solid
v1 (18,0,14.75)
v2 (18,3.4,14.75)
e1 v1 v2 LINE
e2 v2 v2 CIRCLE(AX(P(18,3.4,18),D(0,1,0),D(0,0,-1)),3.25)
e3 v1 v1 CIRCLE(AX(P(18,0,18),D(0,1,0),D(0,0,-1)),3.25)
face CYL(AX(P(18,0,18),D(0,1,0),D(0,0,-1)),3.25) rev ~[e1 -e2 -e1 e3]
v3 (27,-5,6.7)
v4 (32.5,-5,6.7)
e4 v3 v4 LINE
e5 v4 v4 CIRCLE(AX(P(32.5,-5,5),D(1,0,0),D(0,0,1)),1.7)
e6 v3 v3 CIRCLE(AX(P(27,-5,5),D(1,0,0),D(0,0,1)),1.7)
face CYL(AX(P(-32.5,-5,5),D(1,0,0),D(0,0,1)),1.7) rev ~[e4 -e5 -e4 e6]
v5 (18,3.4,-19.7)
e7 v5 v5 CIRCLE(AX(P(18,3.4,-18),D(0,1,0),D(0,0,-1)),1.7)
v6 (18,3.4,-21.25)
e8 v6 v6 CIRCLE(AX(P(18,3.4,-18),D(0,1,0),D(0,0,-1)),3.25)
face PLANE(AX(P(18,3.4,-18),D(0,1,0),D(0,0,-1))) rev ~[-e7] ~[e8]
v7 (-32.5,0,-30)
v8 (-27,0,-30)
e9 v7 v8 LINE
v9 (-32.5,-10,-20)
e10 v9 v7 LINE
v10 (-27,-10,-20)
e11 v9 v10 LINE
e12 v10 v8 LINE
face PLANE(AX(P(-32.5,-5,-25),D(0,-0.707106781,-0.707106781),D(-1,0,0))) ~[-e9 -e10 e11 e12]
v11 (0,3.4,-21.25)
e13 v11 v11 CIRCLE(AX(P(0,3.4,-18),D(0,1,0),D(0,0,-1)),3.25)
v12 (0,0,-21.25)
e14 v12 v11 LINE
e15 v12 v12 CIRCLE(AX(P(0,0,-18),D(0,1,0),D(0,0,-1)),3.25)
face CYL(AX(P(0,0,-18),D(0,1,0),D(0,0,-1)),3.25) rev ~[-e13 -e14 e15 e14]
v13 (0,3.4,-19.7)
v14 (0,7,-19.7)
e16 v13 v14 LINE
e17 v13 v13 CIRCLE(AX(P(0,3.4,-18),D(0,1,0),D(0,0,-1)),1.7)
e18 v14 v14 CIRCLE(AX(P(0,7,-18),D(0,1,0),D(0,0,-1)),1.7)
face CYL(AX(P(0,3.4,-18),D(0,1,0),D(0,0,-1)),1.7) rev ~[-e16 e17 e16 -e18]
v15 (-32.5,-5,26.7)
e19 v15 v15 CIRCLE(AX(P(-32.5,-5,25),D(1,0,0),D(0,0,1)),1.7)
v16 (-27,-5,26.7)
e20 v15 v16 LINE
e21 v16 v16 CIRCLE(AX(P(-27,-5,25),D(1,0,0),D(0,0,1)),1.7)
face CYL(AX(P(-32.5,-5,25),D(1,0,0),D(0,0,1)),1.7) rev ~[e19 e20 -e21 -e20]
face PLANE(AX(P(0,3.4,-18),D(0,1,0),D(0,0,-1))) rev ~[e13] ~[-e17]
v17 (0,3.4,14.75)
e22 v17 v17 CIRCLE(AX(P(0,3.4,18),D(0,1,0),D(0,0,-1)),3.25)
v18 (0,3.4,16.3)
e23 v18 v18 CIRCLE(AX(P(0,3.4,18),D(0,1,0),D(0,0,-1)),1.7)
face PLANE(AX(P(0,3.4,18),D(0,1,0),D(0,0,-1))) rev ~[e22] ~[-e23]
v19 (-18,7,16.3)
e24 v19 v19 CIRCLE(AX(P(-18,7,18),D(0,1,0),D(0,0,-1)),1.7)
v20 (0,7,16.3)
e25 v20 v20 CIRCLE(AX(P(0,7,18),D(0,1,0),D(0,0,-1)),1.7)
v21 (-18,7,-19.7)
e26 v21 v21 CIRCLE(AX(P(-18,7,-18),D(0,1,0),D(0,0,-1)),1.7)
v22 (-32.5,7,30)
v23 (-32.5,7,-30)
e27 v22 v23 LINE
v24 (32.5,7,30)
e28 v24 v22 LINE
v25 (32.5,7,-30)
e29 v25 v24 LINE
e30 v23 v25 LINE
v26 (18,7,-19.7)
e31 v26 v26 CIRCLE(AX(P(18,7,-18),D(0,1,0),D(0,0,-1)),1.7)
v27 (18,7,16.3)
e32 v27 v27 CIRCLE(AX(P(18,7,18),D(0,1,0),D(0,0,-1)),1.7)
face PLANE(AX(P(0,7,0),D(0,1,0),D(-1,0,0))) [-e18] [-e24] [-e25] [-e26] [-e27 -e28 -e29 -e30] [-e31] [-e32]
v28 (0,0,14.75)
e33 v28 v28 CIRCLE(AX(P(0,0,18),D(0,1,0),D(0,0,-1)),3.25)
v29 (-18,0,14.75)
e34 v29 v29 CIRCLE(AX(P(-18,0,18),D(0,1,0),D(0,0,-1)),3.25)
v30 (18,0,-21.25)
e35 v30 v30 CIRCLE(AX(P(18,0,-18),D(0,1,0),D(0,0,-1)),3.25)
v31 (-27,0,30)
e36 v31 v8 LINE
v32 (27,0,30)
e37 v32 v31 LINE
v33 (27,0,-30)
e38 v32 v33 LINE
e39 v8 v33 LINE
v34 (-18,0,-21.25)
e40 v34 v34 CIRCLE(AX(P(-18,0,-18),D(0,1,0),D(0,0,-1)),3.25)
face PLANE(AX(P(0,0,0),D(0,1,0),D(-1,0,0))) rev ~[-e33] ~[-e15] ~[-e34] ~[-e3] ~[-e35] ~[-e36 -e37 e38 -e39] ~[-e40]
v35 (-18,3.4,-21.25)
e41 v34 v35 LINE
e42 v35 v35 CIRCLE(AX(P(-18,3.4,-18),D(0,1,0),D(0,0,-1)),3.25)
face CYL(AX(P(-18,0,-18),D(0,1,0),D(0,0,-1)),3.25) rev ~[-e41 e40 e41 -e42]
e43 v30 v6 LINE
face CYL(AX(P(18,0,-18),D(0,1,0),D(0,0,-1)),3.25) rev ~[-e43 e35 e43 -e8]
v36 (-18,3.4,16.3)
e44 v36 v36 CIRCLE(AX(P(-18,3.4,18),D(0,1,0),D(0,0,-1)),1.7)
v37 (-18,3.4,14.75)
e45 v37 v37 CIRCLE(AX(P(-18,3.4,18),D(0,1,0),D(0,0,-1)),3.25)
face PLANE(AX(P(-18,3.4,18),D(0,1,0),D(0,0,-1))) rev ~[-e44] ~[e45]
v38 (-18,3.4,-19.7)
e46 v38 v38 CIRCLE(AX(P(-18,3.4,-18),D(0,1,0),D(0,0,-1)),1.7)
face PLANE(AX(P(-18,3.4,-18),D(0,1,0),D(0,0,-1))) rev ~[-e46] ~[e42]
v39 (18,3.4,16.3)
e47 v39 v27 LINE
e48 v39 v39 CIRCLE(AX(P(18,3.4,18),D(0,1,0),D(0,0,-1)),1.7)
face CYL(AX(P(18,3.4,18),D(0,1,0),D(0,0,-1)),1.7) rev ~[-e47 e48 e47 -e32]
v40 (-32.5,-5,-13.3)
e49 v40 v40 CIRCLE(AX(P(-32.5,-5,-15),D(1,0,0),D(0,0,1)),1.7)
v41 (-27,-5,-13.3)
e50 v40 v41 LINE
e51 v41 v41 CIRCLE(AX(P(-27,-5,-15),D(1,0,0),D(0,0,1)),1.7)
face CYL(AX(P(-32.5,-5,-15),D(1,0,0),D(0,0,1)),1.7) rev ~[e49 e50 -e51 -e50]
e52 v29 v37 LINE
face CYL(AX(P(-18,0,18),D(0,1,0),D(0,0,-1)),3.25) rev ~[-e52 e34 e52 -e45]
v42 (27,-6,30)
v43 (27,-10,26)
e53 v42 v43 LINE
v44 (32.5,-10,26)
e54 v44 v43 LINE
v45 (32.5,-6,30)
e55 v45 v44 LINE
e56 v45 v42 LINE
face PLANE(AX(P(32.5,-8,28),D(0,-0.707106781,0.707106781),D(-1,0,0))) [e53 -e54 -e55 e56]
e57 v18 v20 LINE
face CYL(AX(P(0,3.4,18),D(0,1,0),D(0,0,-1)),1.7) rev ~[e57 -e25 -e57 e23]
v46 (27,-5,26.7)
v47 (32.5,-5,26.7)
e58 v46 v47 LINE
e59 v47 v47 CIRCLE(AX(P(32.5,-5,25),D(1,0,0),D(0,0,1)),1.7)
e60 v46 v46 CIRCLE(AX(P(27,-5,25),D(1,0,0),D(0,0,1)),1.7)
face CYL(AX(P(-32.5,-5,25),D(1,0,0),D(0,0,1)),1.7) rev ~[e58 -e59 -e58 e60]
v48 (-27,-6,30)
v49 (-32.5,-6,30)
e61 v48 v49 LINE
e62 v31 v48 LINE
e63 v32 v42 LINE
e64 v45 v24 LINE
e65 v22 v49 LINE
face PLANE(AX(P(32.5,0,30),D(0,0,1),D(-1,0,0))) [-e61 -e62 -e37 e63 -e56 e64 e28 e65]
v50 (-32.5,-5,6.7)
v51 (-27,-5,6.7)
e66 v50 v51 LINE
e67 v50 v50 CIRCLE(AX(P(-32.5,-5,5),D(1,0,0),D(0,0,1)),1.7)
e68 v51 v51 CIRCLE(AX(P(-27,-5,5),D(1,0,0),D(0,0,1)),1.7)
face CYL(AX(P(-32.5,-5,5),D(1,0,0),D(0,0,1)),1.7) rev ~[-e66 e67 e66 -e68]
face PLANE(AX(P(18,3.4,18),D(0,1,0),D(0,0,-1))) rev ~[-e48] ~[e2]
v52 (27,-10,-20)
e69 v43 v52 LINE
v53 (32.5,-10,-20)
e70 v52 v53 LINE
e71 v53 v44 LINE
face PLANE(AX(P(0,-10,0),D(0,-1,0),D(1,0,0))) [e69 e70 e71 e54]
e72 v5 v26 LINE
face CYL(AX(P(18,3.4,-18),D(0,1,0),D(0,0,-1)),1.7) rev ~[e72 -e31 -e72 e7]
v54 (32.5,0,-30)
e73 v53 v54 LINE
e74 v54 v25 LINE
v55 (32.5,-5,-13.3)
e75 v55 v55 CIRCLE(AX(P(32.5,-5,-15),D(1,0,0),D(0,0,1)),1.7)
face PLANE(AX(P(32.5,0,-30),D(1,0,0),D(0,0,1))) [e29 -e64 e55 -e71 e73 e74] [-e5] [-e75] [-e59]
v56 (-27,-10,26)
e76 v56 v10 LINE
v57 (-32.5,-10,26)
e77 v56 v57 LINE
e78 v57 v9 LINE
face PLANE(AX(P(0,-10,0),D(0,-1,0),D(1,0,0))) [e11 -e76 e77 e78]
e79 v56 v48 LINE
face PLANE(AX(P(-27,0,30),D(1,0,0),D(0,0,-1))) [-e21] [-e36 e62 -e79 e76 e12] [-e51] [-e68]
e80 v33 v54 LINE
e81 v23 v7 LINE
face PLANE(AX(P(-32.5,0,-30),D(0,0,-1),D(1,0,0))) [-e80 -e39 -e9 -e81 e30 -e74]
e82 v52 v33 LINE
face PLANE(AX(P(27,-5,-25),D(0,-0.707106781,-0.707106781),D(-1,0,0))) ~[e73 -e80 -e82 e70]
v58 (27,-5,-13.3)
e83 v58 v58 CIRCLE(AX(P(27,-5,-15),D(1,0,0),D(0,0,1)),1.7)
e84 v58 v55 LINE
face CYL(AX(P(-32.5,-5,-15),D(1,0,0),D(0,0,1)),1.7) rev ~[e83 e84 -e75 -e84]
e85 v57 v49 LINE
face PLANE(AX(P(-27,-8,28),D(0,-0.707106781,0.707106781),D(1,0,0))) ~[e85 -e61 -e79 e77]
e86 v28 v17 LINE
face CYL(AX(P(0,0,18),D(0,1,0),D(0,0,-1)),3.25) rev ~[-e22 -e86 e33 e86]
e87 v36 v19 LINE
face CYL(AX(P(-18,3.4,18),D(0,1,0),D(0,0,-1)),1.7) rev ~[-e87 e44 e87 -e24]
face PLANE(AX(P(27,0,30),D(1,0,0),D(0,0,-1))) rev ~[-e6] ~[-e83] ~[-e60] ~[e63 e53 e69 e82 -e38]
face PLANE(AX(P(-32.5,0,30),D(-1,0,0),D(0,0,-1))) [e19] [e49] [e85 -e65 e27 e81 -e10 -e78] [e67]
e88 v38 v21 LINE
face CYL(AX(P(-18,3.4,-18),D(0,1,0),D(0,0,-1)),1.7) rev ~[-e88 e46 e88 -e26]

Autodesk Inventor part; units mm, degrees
ref_plane "YZ Plane" through (0, 0, 0) normal (1, 0, 0) x (0, 1, 0)
ref_plane "XZ Plane" through (0, 0, 0) normal (0, 1, 0) x (-1, 0, 0)
ref_plane "XY Plane" through (0, 0, 0) normal (0, 0, 1) x (1, 0, 0)
sketch "Skizze1" plane through (0, 0, 0) normal (0, 1, 0) x (-1, 0, 0)
  line L0 (-32.5, 30) -> (32.5, 30)
  line L1 (32.5, 30) -> (32.5, -30)
  line L2 (32.5, -30) -> (-32.5, -30)
  line L3 (-32.5, -30) -> (-32.5, 30)
  line L4 (-32.5, 30) -> (32.5, -30) construction
  line L5 (32.5, 30) -> (-32.5, -30) construction
  point P0 (0, 0)
  dimension "d0" = 65
  dimension "d1" = 60
extrude "Extrusion1" add sketch "Skizze1" along normal blind 7
sketch "Skizze2" plane through (0, 7, 0) normal (0, 1, 0) x (1, 0, 0)
  line L0 (24.5, -20) -> (-24.5, -20)
  line L1 (-24.5, -20) -> (-24.5, 20)
  line L2 (-24.5, 20) -> (24.5, 20)
  line L3 (24.5, 20) -> (24.5, -20)
  line L4 (24.5, -20) -> (-24.5, 20) construction
  line L5 (-24.5, -20) -> (24.5, 20) construction
  line L6 (29.8936, 0) -> (-30.3656, 0) construction
  point P0 (0, 0)
  point P1 (0, 0)
  point P2 (-24.5, 0)
  point P3 (24.5, 0)
  dimension "d4" = 49
  dimension "d5" = 40
hole "Bohrung1" [suppressed]
sketch "Skizze3" plane through (0, 0, 0) normal (0, -1, 0) x (1, 0, 0)
  line L0 (-18, -18) -> (18, -18)
  line L1 (18, -18) -> (18, 18)
  line L2 (18, 18) -> (-18, 18)
  line L3 (-18, 18) -> (-18, -18)
  line L4 (-18, -18) -> (18, 18) construction
  line L5 (18, -18) -> (-18, 18) construction
  line L6 (0, -22.3415) -> (0, 25.3309) construction
  point P0 (0, 0)
  point P1 (0, 18)
  point P2 (0, -18)
  dimension "d13" = 36
  dimension "d14" = 36
hole "Bohrung2" at (0, 0, 18) at (0, 0, -18) at (-18, 0, 18) at (-18, 0, -18) at (18, 0, 18) at (18, 0, -18) direction (0, 1, 0) diameter 3.4 depth 8 tip angle 118 counterbore diameter 6.5 counterbore depth 3.4 clearance for "Inbusschraube ISO 4762" size "M3" standard "ISO"
sketch "Skizze4" plane through (0, 0, 0) normal (0, -1, 0) x (1, 0, 0)
  circle A0 centre (18, 18) radius 3.25 projected
  circle A1 centre (-18, 18) radius 3.25 projected
  circle A2 centre (0, 18) radius 3.25 projected
  circle A3 centre (0, -18) radius 3.25 projected
  circle A4 centre (-18, -18) radius 3.25 projected
  circle A5 centre (18, -18) radius 3.25 projected
  line L0 (32.5, 30) -> (-32.5, 30) projected
  line L1 (-32.5, 30) -> (-32.5, -30) projected
  line L2 (-32.5, -30) -> (32.5, -30) projected
  line L3 (32.5, -30) -> (32.5, 30) projected
  line L4 (-32.5, 30) -> (-27, 30)
  line L5 (-27, 30) -> (-27, -30)
  line L6 (-27, -30) -> (-32.5, -30)
  line L7 (-32.5, -30) -> (-32.5, 30)
  line L8 (32.5, -30) -> (-32.5, -30) projected
  line L9 (27, -30) -> (32.5, -30)
  line L10 (32.5, -30) -> (32.5, 30)
  line L11 (32.5, 30) -> (27, 30)
  line L12 (27, 30) -> (27, -30)
  point P0 (0, 0)
  dimension "d22" = 54
  dimension "d23" = 65
  dimension "d24" = 5.5
extrude "Extrusion2" add sketch "Skizze4" along normal blind 10 contours L3 L2 L12 L0 | L5 L2 L1 L0
sketch "Skizze5" plane through (-32.5, 7, -30) normal (-1, 0, 0) x (0, 0, 1)
  line L0 (0, -7) -> (60, -7) projected
  line L1 (0, -7) -> (0, -17) projected
  line L2 (60, -17) -> (0, -17) projected
  line L3 (60, -7) -> (60, -17) projected
  point P0 (30, -7)
  point P1 (35, -12)
  dimension "d27" = 5
  dimension "d41" = 35
  dimension "d42" = 60
hole "Bohrung3" at (-32.5, -5, 5) direction (1, 0, 0) diameter 3.4 end through all clearance for "Inbusschraube ISO 4762" size "M3" standard "ISO"
pattern_linear "Rechteckige Anordnung1" count 3 spacing 20 along (0, 0, -1) of "Bohrung3" first direction both ways yes
chamfer "Fase2" distance 10 angle 45 2 edges at (-29.75, -10, -30) (29.75, -10, -30)
chamfer "Fase3" distance 4 angle 45 2 edges at (-29.75, -10, 30) (29.75, -10, 30)
equation "\"d24\" = -0.5 * d22 + 0.5 * d23"
properties part number "complex_cube_plane" material "Aluminium 6061"
